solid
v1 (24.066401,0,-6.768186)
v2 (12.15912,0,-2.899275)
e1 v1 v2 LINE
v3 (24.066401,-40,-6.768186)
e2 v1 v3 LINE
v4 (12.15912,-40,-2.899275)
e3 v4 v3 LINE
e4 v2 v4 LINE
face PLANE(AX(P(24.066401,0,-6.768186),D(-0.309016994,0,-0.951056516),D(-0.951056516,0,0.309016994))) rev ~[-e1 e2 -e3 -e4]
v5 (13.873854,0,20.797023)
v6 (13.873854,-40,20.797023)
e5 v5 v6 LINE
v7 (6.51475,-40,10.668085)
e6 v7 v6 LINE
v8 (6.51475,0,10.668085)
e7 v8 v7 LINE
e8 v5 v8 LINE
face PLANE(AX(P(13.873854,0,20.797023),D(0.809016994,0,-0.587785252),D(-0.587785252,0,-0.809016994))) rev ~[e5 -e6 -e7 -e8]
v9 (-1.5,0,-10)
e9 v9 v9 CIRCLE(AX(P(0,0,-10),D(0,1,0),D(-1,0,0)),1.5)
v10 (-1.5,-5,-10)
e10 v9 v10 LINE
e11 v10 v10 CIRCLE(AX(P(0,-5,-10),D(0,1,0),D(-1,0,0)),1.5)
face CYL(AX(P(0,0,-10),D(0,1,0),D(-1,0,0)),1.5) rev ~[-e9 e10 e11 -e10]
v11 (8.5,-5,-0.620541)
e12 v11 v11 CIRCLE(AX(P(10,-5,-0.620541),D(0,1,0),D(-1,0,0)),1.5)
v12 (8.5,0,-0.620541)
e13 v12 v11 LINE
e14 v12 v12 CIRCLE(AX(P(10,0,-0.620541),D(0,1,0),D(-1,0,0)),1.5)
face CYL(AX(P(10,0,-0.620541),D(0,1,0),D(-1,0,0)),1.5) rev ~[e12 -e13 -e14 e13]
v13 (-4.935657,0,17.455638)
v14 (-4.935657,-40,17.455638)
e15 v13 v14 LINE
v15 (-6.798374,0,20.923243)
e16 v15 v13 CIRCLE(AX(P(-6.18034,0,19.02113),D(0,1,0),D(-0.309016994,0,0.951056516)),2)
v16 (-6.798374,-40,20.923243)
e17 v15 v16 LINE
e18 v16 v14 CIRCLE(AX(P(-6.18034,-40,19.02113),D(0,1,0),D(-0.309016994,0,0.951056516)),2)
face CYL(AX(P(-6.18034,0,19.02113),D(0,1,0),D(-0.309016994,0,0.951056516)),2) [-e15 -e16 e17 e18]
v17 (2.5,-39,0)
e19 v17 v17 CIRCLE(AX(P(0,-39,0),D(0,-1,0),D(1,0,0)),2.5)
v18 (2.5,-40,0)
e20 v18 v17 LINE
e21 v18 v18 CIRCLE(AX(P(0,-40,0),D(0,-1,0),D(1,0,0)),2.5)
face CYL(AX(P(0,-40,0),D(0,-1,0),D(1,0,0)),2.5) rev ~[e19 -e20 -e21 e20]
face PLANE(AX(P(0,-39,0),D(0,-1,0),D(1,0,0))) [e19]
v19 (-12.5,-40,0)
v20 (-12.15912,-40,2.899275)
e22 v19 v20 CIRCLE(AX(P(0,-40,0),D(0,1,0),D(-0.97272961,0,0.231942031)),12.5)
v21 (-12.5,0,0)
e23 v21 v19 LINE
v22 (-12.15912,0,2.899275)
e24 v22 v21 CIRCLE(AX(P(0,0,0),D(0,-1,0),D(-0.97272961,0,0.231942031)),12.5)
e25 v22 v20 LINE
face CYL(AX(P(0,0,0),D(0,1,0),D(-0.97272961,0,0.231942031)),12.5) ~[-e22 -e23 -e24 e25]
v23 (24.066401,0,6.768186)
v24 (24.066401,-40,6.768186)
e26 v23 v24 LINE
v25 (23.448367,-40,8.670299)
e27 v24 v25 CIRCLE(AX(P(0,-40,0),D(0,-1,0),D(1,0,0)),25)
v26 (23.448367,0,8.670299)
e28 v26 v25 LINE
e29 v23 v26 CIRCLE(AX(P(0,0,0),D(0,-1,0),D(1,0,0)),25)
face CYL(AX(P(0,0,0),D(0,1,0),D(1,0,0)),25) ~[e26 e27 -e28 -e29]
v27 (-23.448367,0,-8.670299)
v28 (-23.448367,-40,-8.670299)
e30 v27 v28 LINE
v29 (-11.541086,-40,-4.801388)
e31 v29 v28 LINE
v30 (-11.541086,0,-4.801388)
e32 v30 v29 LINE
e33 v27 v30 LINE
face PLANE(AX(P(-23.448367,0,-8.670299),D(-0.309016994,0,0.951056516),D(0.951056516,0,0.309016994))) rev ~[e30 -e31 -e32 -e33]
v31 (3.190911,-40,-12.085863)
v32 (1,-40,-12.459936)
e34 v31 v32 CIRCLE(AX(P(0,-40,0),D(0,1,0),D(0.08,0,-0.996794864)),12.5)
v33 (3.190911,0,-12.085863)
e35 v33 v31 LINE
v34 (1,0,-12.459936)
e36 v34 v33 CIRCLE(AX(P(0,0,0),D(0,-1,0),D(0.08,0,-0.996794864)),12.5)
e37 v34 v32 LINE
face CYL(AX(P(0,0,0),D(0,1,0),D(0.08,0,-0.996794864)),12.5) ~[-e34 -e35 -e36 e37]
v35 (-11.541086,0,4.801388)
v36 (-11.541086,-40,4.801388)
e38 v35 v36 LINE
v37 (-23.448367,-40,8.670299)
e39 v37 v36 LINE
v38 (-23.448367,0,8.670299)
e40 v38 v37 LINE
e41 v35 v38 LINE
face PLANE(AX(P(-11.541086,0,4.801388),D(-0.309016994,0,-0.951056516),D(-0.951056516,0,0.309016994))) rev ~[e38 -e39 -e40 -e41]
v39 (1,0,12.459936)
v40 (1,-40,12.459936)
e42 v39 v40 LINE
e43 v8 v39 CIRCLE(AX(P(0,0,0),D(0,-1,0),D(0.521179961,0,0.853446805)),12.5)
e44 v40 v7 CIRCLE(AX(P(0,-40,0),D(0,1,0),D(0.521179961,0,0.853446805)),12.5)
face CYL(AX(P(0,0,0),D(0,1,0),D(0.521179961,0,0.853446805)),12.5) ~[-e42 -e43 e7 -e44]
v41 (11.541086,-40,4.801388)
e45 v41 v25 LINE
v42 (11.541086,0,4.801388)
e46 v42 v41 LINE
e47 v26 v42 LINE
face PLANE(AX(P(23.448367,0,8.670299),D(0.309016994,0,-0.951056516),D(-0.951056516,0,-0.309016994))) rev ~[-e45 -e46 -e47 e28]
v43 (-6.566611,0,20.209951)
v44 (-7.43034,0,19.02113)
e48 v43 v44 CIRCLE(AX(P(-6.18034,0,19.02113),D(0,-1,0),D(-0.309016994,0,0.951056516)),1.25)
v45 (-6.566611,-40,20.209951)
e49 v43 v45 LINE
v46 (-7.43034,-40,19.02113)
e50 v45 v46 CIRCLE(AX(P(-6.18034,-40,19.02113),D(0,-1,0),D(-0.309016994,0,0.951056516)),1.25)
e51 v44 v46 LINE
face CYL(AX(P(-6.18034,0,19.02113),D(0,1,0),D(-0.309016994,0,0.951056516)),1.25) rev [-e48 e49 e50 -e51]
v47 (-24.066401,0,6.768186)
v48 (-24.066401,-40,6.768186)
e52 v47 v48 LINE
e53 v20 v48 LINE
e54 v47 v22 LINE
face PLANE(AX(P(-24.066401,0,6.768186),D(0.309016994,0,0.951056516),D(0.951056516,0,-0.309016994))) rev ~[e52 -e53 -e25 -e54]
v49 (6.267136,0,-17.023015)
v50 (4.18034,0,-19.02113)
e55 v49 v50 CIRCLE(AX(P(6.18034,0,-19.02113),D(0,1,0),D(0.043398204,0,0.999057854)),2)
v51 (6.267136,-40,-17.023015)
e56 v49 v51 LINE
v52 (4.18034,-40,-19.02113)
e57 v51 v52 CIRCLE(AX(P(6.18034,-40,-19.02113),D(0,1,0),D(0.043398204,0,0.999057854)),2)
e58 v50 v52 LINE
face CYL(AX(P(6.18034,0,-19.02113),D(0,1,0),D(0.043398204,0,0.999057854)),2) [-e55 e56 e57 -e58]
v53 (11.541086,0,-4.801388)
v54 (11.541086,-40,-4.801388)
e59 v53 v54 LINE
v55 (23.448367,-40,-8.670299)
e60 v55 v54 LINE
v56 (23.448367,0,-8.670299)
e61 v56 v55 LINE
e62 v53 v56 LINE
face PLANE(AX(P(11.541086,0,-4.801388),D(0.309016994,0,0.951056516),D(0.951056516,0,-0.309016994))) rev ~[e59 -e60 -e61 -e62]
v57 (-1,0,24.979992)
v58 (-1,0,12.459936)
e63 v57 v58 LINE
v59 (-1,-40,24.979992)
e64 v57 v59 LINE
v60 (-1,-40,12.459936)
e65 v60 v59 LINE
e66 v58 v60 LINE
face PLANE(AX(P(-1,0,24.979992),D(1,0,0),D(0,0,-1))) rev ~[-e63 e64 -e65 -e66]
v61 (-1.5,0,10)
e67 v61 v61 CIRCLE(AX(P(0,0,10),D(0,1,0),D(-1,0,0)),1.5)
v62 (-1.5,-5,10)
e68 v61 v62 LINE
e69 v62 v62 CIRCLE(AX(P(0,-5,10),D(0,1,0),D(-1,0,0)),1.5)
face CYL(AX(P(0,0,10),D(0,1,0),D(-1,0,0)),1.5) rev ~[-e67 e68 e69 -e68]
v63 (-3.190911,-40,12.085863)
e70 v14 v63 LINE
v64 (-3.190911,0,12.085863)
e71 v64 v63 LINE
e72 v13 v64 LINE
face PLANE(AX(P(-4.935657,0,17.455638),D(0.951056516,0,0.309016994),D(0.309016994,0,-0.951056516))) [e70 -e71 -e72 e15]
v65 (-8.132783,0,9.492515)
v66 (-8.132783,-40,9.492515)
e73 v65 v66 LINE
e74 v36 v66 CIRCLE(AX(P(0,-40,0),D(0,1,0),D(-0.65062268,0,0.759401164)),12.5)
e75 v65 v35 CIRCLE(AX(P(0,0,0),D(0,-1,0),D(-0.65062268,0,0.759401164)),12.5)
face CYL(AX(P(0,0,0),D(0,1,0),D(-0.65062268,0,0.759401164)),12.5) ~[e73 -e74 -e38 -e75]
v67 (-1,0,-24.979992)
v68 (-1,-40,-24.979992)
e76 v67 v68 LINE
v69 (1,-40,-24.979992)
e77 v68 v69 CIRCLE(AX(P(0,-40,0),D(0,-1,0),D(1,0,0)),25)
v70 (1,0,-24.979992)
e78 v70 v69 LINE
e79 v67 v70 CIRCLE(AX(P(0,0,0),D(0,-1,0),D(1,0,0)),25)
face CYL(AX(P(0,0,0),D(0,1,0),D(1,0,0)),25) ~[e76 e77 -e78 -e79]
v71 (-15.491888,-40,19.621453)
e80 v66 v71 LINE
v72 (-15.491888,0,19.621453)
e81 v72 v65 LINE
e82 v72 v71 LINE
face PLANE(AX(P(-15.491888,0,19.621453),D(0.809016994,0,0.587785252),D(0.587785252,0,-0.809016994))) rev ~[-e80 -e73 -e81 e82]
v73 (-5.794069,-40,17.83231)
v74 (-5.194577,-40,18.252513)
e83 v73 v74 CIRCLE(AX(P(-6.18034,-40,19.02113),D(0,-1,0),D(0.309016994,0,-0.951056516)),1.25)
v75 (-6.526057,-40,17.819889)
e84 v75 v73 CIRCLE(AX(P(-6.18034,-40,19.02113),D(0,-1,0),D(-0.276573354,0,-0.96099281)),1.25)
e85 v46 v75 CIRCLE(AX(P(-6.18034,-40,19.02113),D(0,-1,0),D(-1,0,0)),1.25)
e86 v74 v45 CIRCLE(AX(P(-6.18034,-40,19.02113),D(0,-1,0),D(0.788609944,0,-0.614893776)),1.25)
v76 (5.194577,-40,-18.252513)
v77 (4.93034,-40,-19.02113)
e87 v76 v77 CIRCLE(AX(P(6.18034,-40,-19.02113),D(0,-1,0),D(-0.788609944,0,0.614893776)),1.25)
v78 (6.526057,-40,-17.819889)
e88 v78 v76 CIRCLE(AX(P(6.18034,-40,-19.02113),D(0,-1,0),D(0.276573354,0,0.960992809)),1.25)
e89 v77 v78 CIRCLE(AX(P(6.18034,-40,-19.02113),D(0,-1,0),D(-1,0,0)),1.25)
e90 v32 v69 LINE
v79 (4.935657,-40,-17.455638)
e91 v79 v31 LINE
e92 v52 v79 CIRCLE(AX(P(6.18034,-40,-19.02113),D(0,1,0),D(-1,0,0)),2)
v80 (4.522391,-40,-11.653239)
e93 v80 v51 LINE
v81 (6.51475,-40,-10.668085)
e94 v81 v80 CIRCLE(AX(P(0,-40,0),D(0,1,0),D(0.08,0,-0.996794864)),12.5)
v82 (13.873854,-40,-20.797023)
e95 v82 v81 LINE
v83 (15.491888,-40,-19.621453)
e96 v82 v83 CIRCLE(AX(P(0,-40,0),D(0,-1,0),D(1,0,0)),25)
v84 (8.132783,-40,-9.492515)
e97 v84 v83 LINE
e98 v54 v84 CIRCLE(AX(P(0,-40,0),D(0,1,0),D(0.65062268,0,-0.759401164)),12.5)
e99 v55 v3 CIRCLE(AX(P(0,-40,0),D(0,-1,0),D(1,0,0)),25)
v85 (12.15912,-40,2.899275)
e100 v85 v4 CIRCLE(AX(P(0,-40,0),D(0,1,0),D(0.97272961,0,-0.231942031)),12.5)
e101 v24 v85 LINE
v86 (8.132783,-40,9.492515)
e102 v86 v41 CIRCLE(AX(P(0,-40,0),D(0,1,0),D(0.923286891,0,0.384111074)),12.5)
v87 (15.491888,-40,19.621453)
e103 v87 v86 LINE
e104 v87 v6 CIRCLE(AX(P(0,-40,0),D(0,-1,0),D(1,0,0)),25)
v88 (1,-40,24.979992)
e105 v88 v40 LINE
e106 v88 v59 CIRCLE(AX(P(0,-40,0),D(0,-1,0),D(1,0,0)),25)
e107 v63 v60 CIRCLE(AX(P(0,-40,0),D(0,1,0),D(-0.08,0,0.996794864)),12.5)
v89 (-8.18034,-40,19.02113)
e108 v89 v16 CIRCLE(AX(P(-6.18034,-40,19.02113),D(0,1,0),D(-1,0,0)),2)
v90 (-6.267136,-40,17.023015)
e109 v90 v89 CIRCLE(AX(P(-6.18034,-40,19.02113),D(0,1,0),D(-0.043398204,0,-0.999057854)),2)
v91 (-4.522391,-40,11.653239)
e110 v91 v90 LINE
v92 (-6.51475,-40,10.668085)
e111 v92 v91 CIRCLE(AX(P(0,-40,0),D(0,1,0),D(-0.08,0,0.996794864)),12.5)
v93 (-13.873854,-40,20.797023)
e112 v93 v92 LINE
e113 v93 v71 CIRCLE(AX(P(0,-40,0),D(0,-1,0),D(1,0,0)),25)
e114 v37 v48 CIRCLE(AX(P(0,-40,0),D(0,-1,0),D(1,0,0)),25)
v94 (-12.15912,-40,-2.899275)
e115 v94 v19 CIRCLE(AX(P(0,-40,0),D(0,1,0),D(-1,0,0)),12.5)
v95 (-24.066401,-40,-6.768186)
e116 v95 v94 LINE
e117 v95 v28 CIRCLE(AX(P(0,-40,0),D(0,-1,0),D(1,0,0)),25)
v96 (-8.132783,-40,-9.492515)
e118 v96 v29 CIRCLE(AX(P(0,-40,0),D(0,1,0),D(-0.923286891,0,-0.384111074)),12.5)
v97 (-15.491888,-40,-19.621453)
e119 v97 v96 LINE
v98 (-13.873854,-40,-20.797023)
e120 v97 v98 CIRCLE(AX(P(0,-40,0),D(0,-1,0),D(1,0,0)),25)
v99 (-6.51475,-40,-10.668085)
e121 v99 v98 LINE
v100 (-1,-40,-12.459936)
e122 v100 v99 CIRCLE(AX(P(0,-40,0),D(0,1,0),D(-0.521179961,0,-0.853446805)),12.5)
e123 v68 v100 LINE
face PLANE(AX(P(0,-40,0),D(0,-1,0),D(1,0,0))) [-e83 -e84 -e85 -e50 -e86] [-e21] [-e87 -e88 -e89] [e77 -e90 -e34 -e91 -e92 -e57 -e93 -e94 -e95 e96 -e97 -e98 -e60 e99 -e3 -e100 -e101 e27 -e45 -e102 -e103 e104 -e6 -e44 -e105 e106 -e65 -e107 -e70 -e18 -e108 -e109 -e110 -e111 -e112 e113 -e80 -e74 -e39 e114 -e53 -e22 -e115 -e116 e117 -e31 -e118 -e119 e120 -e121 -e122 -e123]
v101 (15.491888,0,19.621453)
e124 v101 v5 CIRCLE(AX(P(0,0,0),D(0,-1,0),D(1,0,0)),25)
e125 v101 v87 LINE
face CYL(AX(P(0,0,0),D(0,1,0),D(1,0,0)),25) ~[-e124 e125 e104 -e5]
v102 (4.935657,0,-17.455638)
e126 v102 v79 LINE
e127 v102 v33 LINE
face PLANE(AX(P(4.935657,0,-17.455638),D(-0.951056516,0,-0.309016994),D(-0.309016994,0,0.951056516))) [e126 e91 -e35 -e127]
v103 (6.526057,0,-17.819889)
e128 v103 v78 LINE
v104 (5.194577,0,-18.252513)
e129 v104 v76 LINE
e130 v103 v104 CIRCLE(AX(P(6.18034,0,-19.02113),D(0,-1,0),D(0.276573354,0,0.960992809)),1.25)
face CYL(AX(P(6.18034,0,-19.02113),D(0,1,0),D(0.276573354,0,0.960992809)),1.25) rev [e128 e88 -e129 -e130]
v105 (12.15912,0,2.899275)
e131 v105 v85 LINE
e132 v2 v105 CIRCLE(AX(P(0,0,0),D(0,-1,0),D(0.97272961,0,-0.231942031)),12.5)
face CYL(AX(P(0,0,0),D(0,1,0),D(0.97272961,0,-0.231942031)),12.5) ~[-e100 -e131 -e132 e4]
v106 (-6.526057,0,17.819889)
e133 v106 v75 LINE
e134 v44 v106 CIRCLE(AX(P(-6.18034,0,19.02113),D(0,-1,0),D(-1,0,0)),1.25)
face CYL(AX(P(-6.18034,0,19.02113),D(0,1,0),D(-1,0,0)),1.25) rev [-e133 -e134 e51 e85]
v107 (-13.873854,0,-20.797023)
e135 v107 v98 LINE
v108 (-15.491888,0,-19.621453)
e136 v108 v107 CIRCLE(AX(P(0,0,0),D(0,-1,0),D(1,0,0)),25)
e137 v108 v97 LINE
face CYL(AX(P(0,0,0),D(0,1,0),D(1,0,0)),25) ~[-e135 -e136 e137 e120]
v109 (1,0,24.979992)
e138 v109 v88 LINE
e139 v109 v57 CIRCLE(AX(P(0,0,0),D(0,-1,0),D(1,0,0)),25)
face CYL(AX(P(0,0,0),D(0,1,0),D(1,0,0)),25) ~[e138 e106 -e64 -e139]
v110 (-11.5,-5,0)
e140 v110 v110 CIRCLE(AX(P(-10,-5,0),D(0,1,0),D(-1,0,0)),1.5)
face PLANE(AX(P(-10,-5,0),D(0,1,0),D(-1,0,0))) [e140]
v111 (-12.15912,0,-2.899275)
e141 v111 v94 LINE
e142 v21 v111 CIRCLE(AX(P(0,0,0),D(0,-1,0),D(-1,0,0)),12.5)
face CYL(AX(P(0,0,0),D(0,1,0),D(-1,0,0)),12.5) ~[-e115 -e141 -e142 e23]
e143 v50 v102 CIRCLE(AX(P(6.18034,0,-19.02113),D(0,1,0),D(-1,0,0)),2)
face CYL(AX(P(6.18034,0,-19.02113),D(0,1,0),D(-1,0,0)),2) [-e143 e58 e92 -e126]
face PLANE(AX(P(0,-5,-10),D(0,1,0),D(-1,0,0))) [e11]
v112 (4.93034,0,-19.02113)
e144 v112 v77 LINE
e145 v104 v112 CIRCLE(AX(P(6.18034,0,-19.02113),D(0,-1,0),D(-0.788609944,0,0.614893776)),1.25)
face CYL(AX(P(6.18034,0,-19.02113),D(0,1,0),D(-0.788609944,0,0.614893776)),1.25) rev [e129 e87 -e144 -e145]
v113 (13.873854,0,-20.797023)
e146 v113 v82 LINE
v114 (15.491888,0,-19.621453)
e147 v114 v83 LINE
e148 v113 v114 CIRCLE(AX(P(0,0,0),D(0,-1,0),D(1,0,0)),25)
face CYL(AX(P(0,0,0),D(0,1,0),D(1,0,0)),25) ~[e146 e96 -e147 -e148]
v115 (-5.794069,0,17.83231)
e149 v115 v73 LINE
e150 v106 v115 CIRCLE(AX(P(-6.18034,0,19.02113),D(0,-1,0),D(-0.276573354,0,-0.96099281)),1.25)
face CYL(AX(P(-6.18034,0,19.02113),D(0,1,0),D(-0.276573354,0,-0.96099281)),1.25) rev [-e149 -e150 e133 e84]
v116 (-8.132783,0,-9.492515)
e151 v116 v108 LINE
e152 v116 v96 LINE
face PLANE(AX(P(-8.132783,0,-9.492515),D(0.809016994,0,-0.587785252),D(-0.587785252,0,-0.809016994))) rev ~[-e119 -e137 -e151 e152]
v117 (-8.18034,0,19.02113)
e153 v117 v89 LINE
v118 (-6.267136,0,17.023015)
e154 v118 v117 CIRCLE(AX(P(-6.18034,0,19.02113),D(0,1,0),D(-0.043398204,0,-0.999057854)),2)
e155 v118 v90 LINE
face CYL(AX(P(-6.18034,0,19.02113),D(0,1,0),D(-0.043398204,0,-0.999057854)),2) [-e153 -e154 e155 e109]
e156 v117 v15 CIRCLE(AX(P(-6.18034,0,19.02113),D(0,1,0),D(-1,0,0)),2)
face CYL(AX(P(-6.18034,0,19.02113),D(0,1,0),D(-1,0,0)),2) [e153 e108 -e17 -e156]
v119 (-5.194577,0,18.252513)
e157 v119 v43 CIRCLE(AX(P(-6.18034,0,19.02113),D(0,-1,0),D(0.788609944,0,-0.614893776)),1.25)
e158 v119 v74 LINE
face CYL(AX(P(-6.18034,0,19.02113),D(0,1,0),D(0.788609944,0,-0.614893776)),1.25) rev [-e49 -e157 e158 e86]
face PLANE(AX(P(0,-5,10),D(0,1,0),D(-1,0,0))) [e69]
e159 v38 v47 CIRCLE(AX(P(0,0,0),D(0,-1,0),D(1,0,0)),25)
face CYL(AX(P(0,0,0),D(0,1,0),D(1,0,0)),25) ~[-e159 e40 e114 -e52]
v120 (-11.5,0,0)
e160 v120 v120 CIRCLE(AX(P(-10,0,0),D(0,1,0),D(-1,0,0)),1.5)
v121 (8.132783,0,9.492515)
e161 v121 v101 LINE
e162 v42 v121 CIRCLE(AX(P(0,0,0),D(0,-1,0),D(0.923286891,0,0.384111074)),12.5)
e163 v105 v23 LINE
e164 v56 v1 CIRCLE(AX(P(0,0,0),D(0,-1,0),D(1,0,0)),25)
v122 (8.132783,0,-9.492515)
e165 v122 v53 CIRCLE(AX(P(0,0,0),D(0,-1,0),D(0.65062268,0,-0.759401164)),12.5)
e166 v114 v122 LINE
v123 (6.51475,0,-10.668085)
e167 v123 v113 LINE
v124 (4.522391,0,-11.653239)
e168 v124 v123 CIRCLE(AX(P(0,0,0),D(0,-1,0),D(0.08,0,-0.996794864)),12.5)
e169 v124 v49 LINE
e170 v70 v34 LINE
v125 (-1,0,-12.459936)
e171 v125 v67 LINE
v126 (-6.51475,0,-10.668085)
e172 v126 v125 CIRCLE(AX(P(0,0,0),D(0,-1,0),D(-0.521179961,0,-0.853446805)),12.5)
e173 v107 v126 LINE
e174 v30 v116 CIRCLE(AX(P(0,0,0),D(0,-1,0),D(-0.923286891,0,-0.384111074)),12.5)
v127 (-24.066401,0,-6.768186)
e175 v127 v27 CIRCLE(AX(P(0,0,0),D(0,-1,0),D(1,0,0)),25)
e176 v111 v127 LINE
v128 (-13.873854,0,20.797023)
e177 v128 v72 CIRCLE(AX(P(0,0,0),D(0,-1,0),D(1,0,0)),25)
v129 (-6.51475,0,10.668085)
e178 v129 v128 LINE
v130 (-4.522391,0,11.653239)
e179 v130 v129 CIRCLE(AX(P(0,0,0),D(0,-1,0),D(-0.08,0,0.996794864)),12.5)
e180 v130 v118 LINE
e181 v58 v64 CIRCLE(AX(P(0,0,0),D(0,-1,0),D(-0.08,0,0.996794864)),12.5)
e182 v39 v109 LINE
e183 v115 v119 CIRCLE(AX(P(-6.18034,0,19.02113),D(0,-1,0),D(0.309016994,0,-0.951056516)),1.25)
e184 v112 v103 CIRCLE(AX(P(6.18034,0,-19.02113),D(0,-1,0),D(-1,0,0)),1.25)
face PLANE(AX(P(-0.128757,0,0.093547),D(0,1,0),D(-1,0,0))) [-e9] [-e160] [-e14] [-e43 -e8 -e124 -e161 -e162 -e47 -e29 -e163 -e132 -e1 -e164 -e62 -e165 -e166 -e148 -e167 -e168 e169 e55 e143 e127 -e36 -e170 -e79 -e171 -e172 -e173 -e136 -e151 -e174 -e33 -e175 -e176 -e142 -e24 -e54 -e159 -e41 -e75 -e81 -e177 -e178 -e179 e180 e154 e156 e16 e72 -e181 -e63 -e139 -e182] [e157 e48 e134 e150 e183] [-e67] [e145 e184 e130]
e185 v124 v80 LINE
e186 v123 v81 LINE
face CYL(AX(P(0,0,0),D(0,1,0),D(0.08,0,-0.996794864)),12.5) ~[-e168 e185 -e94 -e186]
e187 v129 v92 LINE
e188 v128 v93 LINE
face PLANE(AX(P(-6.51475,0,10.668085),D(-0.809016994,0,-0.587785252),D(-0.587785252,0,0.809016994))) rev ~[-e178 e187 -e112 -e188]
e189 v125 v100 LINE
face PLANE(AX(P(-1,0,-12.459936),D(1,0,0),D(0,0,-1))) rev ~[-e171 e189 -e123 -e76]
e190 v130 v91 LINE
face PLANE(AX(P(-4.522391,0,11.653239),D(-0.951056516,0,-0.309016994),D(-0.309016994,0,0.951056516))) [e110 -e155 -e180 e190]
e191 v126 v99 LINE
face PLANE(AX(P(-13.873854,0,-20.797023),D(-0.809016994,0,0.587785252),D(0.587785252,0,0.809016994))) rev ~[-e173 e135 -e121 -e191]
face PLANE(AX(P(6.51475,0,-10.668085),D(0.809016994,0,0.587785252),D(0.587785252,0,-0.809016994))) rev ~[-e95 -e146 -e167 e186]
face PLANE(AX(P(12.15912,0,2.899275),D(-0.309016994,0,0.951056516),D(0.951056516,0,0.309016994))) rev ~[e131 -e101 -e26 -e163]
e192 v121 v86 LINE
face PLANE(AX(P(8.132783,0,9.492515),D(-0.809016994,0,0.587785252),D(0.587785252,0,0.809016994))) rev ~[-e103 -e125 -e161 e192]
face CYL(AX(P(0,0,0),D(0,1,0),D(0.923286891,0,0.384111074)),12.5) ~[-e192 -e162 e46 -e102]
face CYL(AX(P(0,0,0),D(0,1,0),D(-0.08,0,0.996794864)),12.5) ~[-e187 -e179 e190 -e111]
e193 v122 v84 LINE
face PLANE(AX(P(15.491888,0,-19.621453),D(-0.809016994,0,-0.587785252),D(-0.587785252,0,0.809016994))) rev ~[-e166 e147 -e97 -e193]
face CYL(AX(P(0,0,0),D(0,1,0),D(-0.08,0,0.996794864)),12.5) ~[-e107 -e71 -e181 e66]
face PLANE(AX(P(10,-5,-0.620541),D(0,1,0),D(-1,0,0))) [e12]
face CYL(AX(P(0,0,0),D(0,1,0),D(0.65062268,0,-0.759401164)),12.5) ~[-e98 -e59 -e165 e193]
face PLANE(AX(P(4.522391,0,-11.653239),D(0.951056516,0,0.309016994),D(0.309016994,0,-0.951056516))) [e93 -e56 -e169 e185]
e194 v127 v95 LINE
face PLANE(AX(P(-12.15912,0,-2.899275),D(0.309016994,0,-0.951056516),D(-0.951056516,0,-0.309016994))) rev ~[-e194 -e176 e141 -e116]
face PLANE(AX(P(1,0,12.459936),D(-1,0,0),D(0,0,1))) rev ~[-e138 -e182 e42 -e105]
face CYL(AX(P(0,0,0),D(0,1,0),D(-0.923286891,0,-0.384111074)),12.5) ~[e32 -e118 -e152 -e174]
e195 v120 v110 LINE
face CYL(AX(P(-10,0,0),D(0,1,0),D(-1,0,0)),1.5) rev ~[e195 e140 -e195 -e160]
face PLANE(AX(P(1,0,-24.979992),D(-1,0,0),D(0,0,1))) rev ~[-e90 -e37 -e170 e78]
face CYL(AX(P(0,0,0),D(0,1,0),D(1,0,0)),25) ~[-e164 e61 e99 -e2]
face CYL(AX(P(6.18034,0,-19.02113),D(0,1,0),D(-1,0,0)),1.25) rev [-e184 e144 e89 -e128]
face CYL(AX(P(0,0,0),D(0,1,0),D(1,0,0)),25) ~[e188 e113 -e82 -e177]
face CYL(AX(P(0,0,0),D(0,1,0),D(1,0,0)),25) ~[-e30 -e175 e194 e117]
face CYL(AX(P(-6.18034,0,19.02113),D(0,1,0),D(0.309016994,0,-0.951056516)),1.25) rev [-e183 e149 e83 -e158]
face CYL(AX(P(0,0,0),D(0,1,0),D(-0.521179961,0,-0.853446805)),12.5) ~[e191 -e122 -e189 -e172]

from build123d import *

# Parameters (mm, degrees)
F0_R      = 25
F1_DEPTH  = 40
F2_R      = 2.5
F3_DEPTH  = 1
F5_DEPTH  = 40.001
F7_DEPTH  = 40
F8_R      = 2.5
F9_DEPTH  = 1
F10_R     = 1.5
F11_DEPTH = 5


with BuildPart() as f1:
    # F0 (on Front) → F1 (new body)
    with BuildSketch(Plane.XZ):
        Circle(F0_R)
    extrude(amount=F1_DEPTH)

    # F2 (on face) → F3 (cut)
    with BuildSketch(Plane(origin=(0, 0, 0), x_dir=(-1, 0, 0), z_dir=(0, 1, 0))):
        Circle(F2_R)
    extrude(amount=-F3_DEPTH, mode=Mode.SUBTRACT)

    # F4 (on face) → F5 (cut, through all)
    with BuildSketch(Plane(origin=(0, 0, 0), x_dir=(-1, 0, 0), z_dir=(0, 1, 0))):
        with BuildLine():
            ThreePointArc((8.1327834988, 9.4925145542), (10.1127124297, 7.3473156537), (11.5410861355, 4.8013884256))
            Line((11.5410861355, 4.8013884256), (23.4483671681, 8.6702985617))
            ThreePointArc((23.4483671681, 8.6702985617), (20.2254248594, 14.6946313073), (15.4918878906, 19.6214527899))
            Line((15.4918878906, 19.6214527899), (8.1327834988, 9.4925145542))
        make_face()
        with BuildLine():
            ThreePointArc((1, 12.4599357944), (3.8627124297, 11.8882064537), (6.5147495101, 10.6680850588))
            Line((6.5147495101, 10.6680850588), (13.8738539018, 20.7970232945))
            ThreePointArc((13.8738539018, 20.7970232945), (7.7254248594, 23.7764129074), (1, 24.9799919936))
            Line((1, 24.9799919936), (1, 12.4599357944))
        make_face()
        with BuildLine():
            ThreePointArc((-6.5147495101, 10.6680850588), (-3.8627124297, 11.8882064537), (-1, 12.4599357944))
            Line((-1, 12.4599357944), (-1, 24.9799919936))
            ThreePointArc((-1, 24.9799919936), (-7.7254248594, 23.7764129074), (-13.8738539018, 20.7970232945))
            Line((-13.8738539018, 20.7970232945), (-6.5147495101, 10.6680850588))
        make_face()
        with BuildLine():
            ThreePointArc((-11.5410861355, 4.8013884256), (-10.1127124297, 7.3473156537), (-8.1327834988, 9.4925145542))
            Line((-8.1327834988, 9.4925145542), (-15.4918878906, 19.6214527899))
            ThreePointArc((-15.4918878906, 19.6214527899), (-20.2254248594, 14.6946313073), (-23.4483671681, 8.6702985617))
            Line((-23.4483671681, 8.6702985617), (-11.5410861355, 4.8013884256))
        make_face()
        with BuildLine():
            ThreePointArc((-12.1591201242, -2.899275393), (-12.5, 0), (-12.1591201242, 2.899275393))
            Line((-12.1591201242, 2.899275393), (-24.0664011569, 6.7681855291))
            ThreePointArc((-24.0664011569, 6.7681855291), (-25, 0), (-24.0664011569, -6.7681855291))
            Line((-24.0664011569, -6.7681855291), (-12.1591201242, -2.899275393))
        make_face()
        with BuildLine():
            Line((-15.4918878906, -19.6214527899), (-8.1327834988, -9.4925145542))
            ThreePointArc((-8.1327834988, -9.4925145542), (-10.1127124297, -7.3473156537), (-11.5410861355, -4.8013884256))
            Line((-11.5410861355, -4.8013884256), (-23.4483671681, -8.6702985617))
            ThreePointArc((-23.4483671681, -8.6702985617), (-20.2254248594, -14.6946313073), (-15.4918878906, -19.6214527899))
        make_face()
        with BuildLine():
            Line((-1, -24.9799919936), (-1, -12.4599357944))
            ThreePointArc((-1, -12.4599357944), (-3.8627124297, -11.8882064537), (-6.5147495101, -10.6680850588))
            Line((-6.5147495101, -10.6680850588), (-13.8738539018, -20.7970232945))
            ThreePointArc((-13.8738539018, -20.7970232945), (-7.7254248594, -23.7764129074), (-1, -24.9799919936))
        make_face()
        with BuildLine():
            Line((13.8738539018, -20.7970232945), (6.5147495101, -10.6680850588))
            ThreePointArc((6.5147495101, -10.6680850588), (3.8627124297, -11.8882064537), (1, -12.4599357944))
            Line((1, -12.4599357944), (1, -24.9799919936))
            ThreePointArc((1, -24.9799919936), (7.7254248594, -23.7764129074), (13.8738539018, -20.7970232945))
        make_face()
        with BuildLine():
            Line((23.4483671681, -8.6702985617), (11.5410861355, -4.8013884256))
            ThreePointArc((11.5410861355, -4.8013884256), (10.1127124297, -7.3473156537), (8.1327834988, -9.4925145542))
            Line((8.1327834988, -9.4925145542), (15.4918878906, -19.6214527899))
            ThreePointArc((15.4918878906, -19.6214527899), (20.2254248594, -14.6946313073), (23.4483671681, -8.6702985617))
        make_face()
        with BuildLine():
            ThreePointArc((12.1591201242, 2.899275393), (12.4144875358, 1.4596229731), (12.5, 0))
            ThreePointArc((12.5, 0), (12.4144875358, -1.4596229731), (12.1591201242, -2.899275393))
            Line((12.1591201242, -2.899275393), (24.0664011569, -6.7681855291))
            ThreePointArc((24.0664011569, -6.7681855291), (24.7655004888, -3.4161360539), (25, 0))
            ThreePointArc((25, 0), (24.7655004888, 3.4161360539), (24.0664011569, 6.7681855291))
            Line((24.0664011569, 6.7681855291), (12.1591201242, 2.899275393))
        make_face()
    extrude(amount=-F5_DEPTH, mode=Mode.SUBTRACT)

    # F6 (on face) → F7 (join)
    with BuildSketch(Plane(origin=(0, 0, 0), x_dir=(-1, 0, 0), z_dir=(0, 1, 0))):
        with BuildLine():
            ThreePointArc((2.5, 0), (2.0225424859, 1.4694631307), (0.7725424859, 2.3776412907))
            ThreePointArc((0.7725424859, 2.3776412907), (-2.0225424859, -1.4694631307), (2.5, 0))
        make_face()
        with BuildLine():
            ThreePointArc((-3.1909113793, -12.0858630048), (-3.8627124297, -11.8882064537), (-4.5223905021, -11.6532392126))
            Line((-4.5223905021, -11.6532392126), (-6.2671362955, -17.0230146177))
            ThreePointArc((-6.2671362955, -17.0230146177), (-5.5623058987, -17.1190172933), (-4.9356571727, -17.4556384098))
            Line((-4.9356571727, -17.4556384098), (-3.1909113793, -12.0858630048))
        make_face()
        with BuildLine():
            Line((-6.5260565798, -17.819889314), (-6.2671362955, -17.0230146177))
            ThreePointArc((-6.2671362955, -17.0230146177), (-7.5635259169, -20.465705145), (-4.1803398875, -19.0211303259))
            ThreePointArc((-4.1803398875, -19.0211303259), (-4.379039603, -18.1520404081), (-4.9356571727, -17.4556384098))
            Line((-4.9356571727, -17.4556384098), (-5.194577457, -18.2525131061))
            ThreePointArc((-5.194577457, -18.2525131061), (-4.9982436481, -18.6147456794), (-4.9303398875, -19.0211303259))
            ThreePointArc((-4.9303398875, -19.0211303259), (-6.9321224806, -20.0197908952), (-6.5260565798, -17.819889314))
        make_face()
        with BuildLine():
            ThreePointArc((3.1909113793, 12.0858630048), (3.5281963151, 11.9917401057), (3.8627124297, 11.8882064537))
            Line((3.8627124297, 11.8882064537), (5.5623058987, 17.1190172933))
            ThreePointArc((5.5623058987, 17.1190172933), (5.233895582, 17.2592440706), (4.9356571727, 17.4556384098))
            Line((4.9356571727, 17.4556384098), (3.1909113793, 12.0858630048))
        make_face()
        with BuildLine():
            Line((5.5623058987, 17.1190172933), (3.8627124297, 11.8882064537))
            ThreePointArc((3.8627124297, 11.8882064537), (4.1941972051, 11.7753432988), (4.5223905021, 11.6532392126))
            Line((4.5223905021, 11.6532392126), (6.2671362955, 17.0230146177))
            ThreePointArc((6.2671362955, 17.0230146177), (5.9104186578, 17.0394283983), (5.5623058987, 17.1190172933))
        make_face()
        with BuildLine():
            ThreePointArc((6.7983738762, 20.9232433585), (4.4184536322, 19.9675746314), (4.9356571727, 17.4556384098))
            Line((4.9356571727, 17.4556384098), (5.194577457, 18.2525131061))
            ThreePointArc((5.194577457, 18.2525131061), (5.1567490659, 19.7385993706), (6.5666111305, 20.2099509713))
            Line((6.5666111305, 20.2099509713), (6.7983738762, 20.9232433585))
        make_face()
        with BuildLine():
            Line((6.5260565798, 17.819889314), (6.2671362955, 17.0230146177))
            ThreePointArc((6.2671362955, 17.0230146177), (7.6249147066, 17.6379442965), (8.1803398875, 19.0211303259))
            ThreePointArc((8.1803398875, 19.0211303259), (7.7983738762, 20.1967008305), (6.7983738762, 20.9232433585))
            Line((6.7983738762, 20.9232433585), (6.5666111305, 20.2099509713))
            ThreePointArc((6.5666111305, 20.2099509713), (7.1916111305, 19.7558618913), (7.4303398875, 19.0211303259))
            ThreePointArc((7.4303398875, 19.0211303259), (7.1790004568, 18.2693477328), (6.5260565798, 17.819889314))
        make_face()
        with BuildLine():
            ThreePointArc((-4.9356571727, -17.4556384098), (-5.5623058987, -17.1190172933), (-6.2671362955, -17.0230146177))
            Line((-6.2671362955, -17.0230146177), (-6.5260565798, -17.819889314))
            ThreePointArc((-6.5260565798, -17.819889314), (-5.7940686445, -17.8323096805), (-5.194577457, -18.2525131061))
            Line((-5.194577457, -18.2525131061), (-4.9356571727, -17.4556384098))
        make_face()
        with BuildLine():
            ThreePointArc((4.9356571727, 17.4556384098), (5.233895582, 17.2592440706), (5.5623058987, 17.1190172933))
            Line((5.5623058987, 17.1190172933), (5.7940686445, 17.8323096805))
            ThreePointArc((5.7940686445, 17.8323096805), (5.4628708429, 17.9975395043), (5.194577457, 18.2525131061))
            Line((5.194577457, 18.2525131061), (4.9356571727, 17.4556384098))
        make_face()
        with BuildLine():
            Line((5.7940686445, 17.8323096805), (5.5623058987, 17.1190172933))
            ThreePointArc((5.5623058987, 17.1190172933), (5.9104186578, 17.0394283983), (6.2671362955, 17.0230146177))
            Line((6.2671362955, 17.0230146177), (6.5260565798, 17.819889314))
            ThreePointArc((6.5260565798, 17.819889314), (6.1591329483, 17.7713102326), (5.7940686445, 17.8323096805))
        make_face()
    extrude(amount=-F7_DEPTH)

    # F8 (on face) → F9 (cut)
    with BuildSketch(Plane.XZ.offset(40)):
        Circle(F8_R)
    extrude(amount=-F9_DEPTH, mode=Mode.SUBTRACT)

    # F10 (on face) → F11 (cut)
    with BuildSketch(Plane(origin=(0, 0, 0), x_dir=(-1, 0, 0), z_dir=(0, 1, 0))):
        with Locations((10, 0)):
            Circle(F10_R)
        with Locations((-10, -0.6205414017)):
            Circle(F10_R)
        with Locations((0, -10)):
            Circle(F10_R)
        with Locations((0, 10)):
            Circle(F10_R)
    extrude(amount=-F11_DEPTH, mode=Mode.SUBTRACT)


solid = f1.part
